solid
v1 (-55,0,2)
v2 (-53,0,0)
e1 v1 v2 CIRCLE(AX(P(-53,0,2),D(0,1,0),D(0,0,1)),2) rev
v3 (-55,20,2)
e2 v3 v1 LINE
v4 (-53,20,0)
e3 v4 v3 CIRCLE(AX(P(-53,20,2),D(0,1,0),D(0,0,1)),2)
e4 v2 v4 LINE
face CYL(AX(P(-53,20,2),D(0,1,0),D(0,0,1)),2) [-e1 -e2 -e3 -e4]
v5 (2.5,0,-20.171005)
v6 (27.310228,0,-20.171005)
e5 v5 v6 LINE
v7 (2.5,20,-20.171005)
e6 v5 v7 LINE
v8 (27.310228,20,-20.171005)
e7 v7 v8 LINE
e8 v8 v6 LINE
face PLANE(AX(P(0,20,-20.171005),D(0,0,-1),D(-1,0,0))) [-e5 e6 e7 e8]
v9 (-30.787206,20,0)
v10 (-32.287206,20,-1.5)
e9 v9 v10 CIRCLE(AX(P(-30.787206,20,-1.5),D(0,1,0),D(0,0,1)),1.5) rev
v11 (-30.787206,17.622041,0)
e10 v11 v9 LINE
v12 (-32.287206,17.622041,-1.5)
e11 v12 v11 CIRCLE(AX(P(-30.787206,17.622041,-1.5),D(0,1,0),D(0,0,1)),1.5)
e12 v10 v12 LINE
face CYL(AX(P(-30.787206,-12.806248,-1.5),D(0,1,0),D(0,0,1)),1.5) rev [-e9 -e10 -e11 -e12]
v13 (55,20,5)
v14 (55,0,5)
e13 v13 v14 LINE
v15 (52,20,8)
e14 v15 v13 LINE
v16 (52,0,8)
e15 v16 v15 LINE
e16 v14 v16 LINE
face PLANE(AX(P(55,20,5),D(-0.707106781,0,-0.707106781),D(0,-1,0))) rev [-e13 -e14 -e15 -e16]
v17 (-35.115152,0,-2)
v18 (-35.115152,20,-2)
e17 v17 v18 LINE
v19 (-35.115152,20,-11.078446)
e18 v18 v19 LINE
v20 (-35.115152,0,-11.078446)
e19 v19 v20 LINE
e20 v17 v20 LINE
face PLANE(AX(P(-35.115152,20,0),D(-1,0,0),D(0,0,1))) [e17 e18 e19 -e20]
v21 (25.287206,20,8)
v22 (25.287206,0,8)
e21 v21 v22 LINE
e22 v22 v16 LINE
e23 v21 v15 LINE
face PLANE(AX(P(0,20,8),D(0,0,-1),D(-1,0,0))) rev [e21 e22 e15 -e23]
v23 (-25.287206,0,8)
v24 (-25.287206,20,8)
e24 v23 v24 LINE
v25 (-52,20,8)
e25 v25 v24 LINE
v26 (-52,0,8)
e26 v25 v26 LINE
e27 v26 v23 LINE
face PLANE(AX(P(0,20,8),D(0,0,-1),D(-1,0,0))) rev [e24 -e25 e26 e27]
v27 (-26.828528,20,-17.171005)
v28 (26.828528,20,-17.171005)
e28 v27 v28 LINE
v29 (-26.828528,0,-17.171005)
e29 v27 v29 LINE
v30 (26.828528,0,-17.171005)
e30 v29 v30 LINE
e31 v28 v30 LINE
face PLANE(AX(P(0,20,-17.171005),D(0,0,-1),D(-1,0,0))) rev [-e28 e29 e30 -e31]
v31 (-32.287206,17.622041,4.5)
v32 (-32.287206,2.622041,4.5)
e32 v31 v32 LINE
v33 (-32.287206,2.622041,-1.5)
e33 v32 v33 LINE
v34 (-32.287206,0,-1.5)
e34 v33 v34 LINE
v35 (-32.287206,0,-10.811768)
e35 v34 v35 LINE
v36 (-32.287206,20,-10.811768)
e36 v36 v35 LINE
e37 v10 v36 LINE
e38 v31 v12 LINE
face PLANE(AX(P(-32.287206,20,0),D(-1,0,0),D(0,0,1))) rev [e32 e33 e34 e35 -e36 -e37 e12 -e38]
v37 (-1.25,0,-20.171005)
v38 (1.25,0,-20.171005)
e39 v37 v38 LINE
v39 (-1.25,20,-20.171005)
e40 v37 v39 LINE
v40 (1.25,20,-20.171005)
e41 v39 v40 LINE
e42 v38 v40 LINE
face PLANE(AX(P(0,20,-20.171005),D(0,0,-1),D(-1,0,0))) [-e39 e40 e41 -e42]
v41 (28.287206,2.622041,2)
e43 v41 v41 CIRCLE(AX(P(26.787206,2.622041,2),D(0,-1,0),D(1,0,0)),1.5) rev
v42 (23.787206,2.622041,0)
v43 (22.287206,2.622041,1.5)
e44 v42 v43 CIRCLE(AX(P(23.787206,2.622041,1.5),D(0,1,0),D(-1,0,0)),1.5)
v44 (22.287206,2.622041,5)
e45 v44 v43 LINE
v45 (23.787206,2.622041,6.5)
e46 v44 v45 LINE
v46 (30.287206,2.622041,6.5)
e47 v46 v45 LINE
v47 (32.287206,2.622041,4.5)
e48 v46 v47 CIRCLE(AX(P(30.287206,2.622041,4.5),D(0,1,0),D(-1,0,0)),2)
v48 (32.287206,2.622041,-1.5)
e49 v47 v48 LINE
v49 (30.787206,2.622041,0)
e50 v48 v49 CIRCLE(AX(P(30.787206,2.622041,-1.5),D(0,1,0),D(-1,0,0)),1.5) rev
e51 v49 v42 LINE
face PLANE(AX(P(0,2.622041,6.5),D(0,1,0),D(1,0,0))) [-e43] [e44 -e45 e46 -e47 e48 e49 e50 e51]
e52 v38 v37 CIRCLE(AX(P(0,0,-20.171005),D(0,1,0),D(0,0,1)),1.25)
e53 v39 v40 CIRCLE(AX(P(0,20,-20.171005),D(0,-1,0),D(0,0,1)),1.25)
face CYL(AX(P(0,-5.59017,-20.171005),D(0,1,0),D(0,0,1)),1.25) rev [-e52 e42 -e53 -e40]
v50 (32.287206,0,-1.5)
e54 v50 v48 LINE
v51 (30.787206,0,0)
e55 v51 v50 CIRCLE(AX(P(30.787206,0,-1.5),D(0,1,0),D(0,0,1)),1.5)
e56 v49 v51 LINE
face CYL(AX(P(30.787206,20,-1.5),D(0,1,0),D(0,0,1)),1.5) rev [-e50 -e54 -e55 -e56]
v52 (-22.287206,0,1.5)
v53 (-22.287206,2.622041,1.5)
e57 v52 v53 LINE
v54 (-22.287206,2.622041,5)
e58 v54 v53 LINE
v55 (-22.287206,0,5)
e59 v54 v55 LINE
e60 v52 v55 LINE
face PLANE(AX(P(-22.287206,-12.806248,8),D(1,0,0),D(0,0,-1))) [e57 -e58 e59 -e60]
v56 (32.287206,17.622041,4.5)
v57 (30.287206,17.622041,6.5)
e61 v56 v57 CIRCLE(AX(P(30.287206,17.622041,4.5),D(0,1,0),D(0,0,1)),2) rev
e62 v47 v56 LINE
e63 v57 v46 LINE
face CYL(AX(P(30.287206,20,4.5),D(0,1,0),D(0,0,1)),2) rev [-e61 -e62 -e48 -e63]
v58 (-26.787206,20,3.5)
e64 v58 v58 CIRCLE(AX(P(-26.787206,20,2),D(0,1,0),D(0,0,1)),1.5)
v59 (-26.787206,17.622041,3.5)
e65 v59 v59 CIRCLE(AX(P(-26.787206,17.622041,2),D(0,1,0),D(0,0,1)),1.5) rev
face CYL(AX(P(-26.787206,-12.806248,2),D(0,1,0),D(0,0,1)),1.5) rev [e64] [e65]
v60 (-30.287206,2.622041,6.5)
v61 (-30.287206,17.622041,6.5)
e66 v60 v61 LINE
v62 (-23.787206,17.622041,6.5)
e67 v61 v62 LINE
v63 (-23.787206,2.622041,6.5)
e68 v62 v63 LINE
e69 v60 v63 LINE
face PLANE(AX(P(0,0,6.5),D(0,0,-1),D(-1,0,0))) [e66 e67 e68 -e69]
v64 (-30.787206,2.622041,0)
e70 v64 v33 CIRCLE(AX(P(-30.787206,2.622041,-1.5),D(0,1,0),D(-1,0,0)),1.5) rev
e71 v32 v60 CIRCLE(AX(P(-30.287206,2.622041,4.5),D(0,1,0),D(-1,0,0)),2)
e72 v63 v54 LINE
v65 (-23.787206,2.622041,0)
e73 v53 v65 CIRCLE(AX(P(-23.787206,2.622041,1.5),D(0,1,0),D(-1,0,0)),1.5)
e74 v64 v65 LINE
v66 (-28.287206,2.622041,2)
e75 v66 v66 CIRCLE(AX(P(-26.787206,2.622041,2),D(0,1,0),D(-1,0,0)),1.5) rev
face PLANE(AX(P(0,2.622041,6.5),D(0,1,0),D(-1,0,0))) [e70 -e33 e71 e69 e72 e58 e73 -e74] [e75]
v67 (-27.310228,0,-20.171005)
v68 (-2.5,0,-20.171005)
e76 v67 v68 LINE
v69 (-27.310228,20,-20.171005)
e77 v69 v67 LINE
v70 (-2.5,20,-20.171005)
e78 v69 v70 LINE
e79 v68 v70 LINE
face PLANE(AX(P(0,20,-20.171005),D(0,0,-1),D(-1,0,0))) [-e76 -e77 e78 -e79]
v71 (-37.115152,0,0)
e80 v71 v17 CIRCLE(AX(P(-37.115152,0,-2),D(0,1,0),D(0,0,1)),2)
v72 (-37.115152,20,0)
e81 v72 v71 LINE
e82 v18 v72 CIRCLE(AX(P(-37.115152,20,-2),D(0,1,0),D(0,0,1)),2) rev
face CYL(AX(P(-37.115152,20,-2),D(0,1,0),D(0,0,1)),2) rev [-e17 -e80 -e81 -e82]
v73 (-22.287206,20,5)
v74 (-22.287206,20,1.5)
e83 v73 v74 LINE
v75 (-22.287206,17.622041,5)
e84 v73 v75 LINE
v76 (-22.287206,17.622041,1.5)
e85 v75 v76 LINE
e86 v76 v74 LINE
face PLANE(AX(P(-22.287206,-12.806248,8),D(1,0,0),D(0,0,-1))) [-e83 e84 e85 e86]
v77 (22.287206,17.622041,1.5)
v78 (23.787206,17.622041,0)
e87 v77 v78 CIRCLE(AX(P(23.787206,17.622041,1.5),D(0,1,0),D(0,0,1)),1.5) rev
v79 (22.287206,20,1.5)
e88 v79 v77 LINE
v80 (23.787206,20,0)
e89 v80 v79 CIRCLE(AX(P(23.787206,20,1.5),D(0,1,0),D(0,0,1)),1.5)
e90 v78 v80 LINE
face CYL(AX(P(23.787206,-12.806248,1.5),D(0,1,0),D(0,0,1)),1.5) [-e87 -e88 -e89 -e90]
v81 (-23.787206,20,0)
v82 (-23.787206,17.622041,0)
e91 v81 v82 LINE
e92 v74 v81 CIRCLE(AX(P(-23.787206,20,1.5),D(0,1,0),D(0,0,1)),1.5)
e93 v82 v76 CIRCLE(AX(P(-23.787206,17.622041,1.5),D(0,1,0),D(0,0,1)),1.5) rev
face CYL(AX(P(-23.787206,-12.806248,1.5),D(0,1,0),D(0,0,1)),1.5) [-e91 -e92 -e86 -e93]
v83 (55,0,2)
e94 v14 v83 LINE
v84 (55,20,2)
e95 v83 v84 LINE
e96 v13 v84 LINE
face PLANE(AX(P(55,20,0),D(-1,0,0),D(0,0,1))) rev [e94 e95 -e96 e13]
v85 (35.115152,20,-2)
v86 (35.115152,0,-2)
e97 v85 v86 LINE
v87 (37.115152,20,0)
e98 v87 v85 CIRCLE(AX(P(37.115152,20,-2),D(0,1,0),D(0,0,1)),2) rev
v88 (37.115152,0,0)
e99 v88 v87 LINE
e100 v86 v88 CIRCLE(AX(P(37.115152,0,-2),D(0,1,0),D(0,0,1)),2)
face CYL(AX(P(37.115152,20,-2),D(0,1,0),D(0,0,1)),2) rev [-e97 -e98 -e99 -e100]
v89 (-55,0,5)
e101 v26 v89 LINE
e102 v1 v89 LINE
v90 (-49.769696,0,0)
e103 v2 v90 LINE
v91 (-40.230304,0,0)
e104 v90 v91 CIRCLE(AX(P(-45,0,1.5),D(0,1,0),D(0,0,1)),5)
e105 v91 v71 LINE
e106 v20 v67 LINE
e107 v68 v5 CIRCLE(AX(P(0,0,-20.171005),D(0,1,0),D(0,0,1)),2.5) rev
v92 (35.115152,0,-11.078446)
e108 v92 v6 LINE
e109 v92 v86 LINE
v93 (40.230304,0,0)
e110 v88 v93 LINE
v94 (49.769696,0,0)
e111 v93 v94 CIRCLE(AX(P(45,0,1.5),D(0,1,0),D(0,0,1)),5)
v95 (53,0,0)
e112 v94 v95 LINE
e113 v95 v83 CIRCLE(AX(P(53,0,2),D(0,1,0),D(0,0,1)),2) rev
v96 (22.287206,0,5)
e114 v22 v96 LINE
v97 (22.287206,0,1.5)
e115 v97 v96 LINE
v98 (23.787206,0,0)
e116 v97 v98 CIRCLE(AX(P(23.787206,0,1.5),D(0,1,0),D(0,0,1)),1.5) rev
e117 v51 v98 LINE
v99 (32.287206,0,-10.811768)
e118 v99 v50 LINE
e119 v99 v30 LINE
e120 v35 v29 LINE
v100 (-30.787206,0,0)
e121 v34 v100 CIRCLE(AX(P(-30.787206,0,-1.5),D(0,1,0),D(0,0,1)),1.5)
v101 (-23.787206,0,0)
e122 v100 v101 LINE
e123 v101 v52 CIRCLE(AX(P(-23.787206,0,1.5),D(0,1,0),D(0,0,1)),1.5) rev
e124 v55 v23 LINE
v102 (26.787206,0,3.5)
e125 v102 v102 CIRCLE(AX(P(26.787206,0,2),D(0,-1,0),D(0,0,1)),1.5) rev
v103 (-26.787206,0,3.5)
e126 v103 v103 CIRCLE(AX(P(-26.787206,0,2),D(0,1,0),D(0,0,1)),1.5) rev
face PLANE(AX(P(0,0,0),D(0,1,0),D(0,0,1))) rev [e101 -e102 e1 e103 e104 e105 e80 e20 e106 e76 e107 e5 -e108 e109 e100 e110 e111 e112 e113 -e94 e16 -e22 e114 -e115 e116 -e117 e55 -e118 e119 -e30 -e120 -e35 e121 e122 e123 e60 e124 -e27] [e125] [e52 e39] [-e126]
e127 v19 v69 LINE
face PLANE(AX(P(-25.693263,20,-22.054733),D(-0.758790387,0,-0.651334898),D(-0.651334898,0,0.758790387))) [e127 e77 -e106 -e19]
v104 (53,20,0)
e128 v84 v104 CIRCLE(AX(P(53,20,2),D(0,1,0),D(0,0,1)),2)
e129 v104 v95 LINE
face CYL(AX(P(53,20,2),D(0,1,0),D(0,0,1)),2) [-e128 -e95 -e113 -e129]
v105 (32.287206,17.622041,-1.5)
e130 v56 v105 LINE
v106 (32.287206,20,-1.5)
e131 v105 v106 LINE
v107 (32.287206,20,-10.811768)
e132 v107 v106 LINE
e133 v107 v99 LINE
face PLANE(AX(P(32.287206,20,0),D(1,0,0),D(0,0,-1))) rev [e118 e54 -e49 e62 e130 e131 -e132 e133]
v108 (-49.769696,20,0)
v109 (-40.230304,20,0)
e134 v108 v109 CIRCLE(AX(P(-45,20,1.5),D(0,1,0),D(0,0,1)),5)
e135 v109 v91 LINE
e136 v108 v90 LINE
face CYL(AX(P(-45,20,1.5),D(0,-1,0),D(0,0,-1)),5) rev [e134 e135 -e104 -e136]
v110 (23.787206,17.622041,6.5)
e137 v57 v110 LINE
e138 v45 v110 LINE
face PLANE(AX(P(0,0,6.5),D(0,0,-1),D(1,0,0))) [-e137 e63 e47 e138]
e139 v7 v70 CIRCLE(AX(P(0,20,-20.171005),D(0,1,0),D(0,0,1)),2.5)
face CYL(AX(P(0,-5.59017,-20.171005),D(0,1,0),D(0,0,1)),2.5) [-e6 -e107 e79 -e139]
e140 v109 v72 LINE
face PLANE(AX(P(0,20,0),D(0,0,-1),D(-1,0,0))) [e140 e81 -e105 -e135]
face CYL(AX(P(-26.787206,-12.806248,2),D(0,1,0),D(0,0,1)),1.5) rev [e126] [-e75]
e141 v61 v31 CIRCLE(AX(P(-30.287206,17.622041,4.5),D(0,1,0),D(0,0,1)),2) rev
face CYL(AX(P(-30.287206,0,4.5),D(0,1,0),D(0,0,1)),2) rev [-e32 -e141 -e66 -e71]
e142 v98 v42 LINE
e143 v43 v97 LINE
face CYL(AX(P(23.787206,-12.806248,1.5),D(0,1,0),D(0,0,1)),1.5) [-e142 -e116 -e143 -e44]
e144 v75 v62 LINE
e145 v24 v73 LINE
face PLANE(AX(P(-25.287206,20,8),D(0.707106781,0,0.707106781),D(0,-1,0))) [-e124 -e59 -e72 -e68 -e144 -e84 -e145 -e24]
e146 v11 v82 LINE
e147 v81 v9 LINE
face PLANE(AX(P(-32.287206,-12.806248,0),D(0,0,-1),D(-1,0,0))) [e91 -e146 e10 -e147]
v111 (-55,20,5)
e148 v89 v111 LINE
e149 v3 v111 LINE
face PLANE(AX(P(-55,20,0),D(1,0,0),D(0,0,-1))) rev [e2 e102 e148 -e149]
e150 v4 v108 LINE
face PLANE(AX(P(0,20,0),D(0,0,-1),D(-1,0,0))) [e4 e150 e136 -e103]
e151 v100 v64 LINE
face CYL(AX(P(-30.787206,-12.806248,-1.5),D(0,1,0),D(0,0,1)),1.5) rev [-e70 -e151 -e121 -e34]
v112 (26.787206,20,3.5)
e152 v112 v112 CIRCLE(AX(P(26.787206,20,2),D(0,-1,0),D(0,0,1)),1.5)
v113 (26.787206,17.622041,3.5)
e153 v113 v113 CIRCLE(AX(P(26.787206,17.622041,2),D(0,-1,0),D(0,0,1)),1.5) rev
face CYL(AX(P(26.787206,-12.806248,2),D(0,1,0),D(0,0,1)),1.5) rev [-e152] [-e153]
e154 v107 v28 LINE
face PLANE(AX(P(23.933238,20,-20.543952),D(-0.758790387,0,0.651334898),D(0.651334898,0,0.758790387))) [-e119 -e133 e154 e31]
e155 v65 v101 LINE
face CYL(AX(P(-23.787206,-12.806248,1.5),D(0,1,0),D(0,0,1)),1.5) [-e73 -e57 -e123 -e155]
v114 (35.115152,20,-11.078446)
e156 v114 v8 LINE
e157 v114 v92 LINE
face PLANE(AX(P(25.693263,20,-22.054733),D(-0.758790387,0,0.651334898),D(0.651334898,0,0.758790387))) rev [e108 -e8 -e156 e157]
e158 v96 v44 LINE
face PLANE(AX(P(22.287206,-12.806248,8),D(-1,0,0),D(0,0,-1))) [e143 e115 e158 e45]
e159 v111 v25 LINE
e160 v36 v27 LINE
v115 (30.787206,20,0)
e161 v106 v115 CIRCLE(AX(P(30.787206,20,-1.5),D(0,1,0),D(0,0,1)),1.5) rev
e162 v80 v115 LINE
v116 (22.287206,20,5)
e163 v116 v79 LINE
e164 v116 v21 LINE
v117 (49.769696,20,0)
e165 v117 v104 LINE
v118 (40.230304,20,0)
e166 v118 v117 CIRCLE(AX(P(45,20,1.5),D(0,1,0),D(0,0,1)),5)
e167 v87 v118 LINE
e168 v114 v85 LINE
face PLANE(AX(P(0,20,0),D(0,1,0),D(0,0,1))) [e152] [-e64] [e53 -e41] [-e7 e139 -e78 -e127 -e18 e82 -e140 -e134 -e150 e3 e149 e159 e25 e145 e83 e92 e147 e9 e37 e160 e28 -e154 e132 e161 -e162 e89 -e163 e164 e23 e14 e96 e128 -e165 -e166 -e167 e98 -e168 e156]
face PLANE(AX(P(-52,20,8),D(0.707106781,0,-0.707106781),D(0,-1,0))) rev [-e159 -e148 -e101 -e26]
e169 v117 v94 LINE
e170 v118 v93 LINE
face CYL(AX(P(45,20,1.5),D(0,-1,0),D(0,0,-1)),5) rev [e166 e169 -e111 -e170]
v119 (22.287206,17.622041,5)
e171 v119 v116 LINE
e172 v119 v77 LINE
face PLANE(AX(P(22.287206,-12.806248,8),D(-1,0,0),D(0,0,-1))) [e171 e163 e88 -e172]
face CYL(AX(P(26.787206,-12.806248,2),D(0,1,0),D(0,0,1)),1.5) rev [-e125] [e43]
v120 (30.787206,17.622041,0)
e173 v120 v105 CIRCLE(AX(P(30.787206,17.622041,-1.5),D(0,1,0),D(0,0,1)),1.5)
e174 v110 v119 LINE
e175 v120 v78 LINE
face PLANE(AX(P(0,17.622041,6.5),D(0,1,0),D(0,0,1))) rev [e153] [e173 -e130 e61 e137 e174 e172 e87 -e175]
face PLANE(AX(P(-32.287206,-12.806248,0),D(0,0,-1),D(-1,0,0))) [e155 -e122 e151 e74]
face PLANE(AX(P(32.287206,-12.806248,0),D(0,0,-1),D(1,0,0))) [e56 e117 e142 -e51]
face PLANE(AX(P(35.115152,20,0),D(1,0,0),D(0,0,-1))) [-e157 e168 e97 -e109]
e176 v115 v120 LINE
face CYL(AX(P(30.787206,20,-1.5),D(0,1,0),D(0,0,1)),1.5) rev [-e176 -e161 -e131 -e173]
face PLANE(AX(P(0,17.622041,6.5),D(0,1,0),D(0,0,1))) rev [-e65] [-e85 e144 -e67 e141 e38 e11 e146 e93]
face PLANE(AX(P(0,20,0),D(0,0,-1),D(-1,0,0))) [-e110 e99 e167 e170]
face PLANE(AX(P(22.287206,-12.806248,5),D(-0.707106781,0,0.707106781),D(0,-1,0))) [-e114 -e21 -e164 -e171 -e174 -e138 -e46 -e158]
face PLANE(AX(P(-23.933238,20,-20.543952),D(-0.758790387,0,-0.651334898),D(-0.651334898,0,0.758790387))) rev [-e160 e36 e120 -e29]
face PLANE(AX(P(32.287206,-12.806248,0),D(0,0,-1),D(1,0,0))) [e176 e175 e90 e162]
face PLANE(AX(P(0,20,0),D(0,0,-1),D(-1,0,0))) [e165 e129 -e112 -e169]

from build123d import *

# Parameters (mm, degrees)
EXTRUDE_1_DEPTH     = 20
SKETCH_2_W          = 10
SKETCH_2_H          = 8
SKETCH_2_R          = 1.5
EXTRUDE_2_DEPTH     = 20
SKETCH_3_W          = 10
SKETCH_3_H          = 15
CUT_EXTRUDE_1_DEPTH = 6.5
CHAMFER_1_SIZE      = 3
FILLET_1_R          = 2
FILLET_2_R          = 1.5
EXTRUDE_3_DEPTH     = 20


with BuildPart() as part:
    # 草图1 → 凸台-拉伸1 (new body)
    with BuildSketch(Plane(origin=(0, 0, 0), x_dir=(1, 0, 0), z_dir=(0, 1, 0))):
        with BuildLine():
            Line((-52.384848004, 0), (-49.769696007, 0))
            ThreePointArc((-49.769696007, 0), (-45, -6.5), (-40.230303993, 0))
            Line((-40.230303993, 0), (-35.115151996, 0))
            Line((-35.115151996, 0), (-35.115151996, 11.078445968))
            Line((-35.115151996, 11.078445968), (-27.310228331, 20.17100506))
            Line((-27.310228331, 20.17100506), (27.310228331, 20.17100506))
            Line((27.310228331, 20.17100506), (35.115151996, 11.078445968))
            Line((35.115151996, 11.078445968), (35.115151996, 0))
            Line((35.115151996, 0), (40.230303993, 0))
            ThreePointArc((40.230303993, 0), (45, -6.5), (49.769696007, 0))
            Line((49.769696007, 0), (52.384848004, 0))
            Line((52.384848004, 0), (55, 0))
            Line((55, 0), (55, -8))
            Line((55, -8), (32.287206254, -8))
            Line((32.287206254, -8), (32.287206254, 10.811768263))
            Line((32.287206254, 10.811768263), (26.82852765, 17.17100506))
            Line((26.82852765, 17.17100506), (-26.82852765, 17.17100506))
            Line((-26.82852765, 17.17100506), (-32.287206254, 10.811768263))
            Line((-32.287206254, 10.811768263), (-32.287206254, -8))
            Line((-32.287206254, -8), (-55, -8))
            Line((-55, -8), (-55, 0))
            Line((-55, 0), (-52.384848004, 0))
        make_face()
    extrude(amount=EXTRUDE_1_DEPTH)

    # 草图2 → 凸台-拉伸2 (add)
    with BuildSketch(Plane(origin=(0, 20, 0), x_dir=(1, 0, 0), z_dir=(0, 1, 0))):
        with Locations((-27.287206254, -4)):
            Rectangle(SKETCH_2_W, SKETCH_2_H)
        with Locations(Location((-26.787206254, -2, 0), (0, 0, 270))):
            Circle(SKETCH_2_R, mode=Mode.SUBTRACT)
    extrude(amount=-EXTRUDE_2_DEPTH)

    # 草图3 → 切除-拉伸1 (cut)
    with BuildSketch(Plane(origin=(0, 0, 0), x_dir=(-1, 0, 0), z_dir=(0, 0, -1))):
        with Locations((27.287206254, 10.122040723)):
            Rectangle(SKETCH_3_W, SKETCH_3_H)
    extrude(amount=-CUT_EXTRUDE_1_DEPTH, mode=Mode.SUBTRACT)

    # 镜向1: part across plane


with BuildPart() as part_1:
    add(part.part)
    add(part.part.mirror(Plane.ZY))

    # 倒角1
    # the kernel refuses this chamfer: 3 mm, written as the material it takes off along each edge
    with BuildSketch(Plane(origin=(22.287206254, 27.715048964, 8), x_dir=(-0.027495876610587933, 0, -0.9996219169112968), z_dir=(0, -1, 0)), Plane(origin=(-22.287206254, 27.715048964, 8), x_dir=(-0.9996219169112968, 0, 0.02749587661058619), z_dir=(0, -1, 0))) as chamfer_1_piece_1:
        Polygon((CHAMFER_1_SIZE * 0.999621916911, CHAMFER_1_SIZE * 0.0274958766106), (-CHAMFER_1_SIZE * 0.0274958766106, CHAMFER_1_SIZE * 0.999621916911), (0, 0), align=None)
    extrude(amount=35.430097928, mode=Mode.SUBTRACT)
    with BuildSketch(Plane(origin=(55, -7.715048964, 8), x_dir=(-0.9996219169112965, 0, 0.02749587661058705), z_dir=(0, 1, 0)), Plane(origin=(-55, -7.715048964, 8), x_dir=(-0.027495876610586775, 0, -0.9996219169112968), z_dir=(0, 1, 0))) as chamfer_1_piece_2:
        Polygon((CHAMFER_1_SIZE * 0.999621916911, -CHAMFER_1_SIZE * 0.0274958766106), (-CHAMFER_1_SIZE * 0.0274958766106, -CHAMFER_1_SIZE * 0.999621916911), (0, 0), align=None)
    extrude(amount=35.430097928, mode=Mode.SUBTRACT)

    # 圆角1
    fillet_1_edges = [part_1.edges().sort_by_distance(p)[0] for p in [
        (32.287206254, 10.122040723, 6.5),
        (55, 10, 0),
        (-55, 10, 0),
        (-35.115151996, 10, 0),
        (35.115151996, 10, 0),
        (-32.287206254, 10.122040723, 6.5),
    ]]
    fillet(fillet_1_edges, radius=FILLET_1_R)

    # 圆角2
    fillet_2_edges = [part_1.edges().sort_by_distance(p)[0] for p in [
        (22.287206254, 1.311020362, 0),
        (32.287206254, 1.311020362, 0),
        (32.287206254, 18.811020362, 0),
        (22.287206254, 18.811020362, 0),
        (-22.287206254, 1.311020362, 0),
        (-32.287206254, 1.311020362, 0),
        (-32.287206254, 18.811020362, 0),
        (-22.287206254, 18.811020362, 0),
    ]]
    fillet(fillet_2_edges, radius=FILLET_2_R)

    # 草图4 → 凸台-拉伸3 (add)
    with BuildSketch(Plane(origin=(0, 20, 0), x_dir=(1, 0, 0), z_dir=(0, 1, 0))):
        with BuildLine():
            Line((-2.5, 20.17100506), (-1.25, 20.17100506))
            ThreePointArc((-1.25, 20.17100506), (0, 21.42100506), (1.25, 20.17100506))
            Line((1.25, 20.17100506), (2.5, 20.17100506))
            ThreePointArc((2.5, 20.17100506), (0, 22.67100506), (-2.5, 20.17100506))
        make_face()
    extrude(amount=-EXTRUDE_3_DEPTH)


solid = part_1.part
